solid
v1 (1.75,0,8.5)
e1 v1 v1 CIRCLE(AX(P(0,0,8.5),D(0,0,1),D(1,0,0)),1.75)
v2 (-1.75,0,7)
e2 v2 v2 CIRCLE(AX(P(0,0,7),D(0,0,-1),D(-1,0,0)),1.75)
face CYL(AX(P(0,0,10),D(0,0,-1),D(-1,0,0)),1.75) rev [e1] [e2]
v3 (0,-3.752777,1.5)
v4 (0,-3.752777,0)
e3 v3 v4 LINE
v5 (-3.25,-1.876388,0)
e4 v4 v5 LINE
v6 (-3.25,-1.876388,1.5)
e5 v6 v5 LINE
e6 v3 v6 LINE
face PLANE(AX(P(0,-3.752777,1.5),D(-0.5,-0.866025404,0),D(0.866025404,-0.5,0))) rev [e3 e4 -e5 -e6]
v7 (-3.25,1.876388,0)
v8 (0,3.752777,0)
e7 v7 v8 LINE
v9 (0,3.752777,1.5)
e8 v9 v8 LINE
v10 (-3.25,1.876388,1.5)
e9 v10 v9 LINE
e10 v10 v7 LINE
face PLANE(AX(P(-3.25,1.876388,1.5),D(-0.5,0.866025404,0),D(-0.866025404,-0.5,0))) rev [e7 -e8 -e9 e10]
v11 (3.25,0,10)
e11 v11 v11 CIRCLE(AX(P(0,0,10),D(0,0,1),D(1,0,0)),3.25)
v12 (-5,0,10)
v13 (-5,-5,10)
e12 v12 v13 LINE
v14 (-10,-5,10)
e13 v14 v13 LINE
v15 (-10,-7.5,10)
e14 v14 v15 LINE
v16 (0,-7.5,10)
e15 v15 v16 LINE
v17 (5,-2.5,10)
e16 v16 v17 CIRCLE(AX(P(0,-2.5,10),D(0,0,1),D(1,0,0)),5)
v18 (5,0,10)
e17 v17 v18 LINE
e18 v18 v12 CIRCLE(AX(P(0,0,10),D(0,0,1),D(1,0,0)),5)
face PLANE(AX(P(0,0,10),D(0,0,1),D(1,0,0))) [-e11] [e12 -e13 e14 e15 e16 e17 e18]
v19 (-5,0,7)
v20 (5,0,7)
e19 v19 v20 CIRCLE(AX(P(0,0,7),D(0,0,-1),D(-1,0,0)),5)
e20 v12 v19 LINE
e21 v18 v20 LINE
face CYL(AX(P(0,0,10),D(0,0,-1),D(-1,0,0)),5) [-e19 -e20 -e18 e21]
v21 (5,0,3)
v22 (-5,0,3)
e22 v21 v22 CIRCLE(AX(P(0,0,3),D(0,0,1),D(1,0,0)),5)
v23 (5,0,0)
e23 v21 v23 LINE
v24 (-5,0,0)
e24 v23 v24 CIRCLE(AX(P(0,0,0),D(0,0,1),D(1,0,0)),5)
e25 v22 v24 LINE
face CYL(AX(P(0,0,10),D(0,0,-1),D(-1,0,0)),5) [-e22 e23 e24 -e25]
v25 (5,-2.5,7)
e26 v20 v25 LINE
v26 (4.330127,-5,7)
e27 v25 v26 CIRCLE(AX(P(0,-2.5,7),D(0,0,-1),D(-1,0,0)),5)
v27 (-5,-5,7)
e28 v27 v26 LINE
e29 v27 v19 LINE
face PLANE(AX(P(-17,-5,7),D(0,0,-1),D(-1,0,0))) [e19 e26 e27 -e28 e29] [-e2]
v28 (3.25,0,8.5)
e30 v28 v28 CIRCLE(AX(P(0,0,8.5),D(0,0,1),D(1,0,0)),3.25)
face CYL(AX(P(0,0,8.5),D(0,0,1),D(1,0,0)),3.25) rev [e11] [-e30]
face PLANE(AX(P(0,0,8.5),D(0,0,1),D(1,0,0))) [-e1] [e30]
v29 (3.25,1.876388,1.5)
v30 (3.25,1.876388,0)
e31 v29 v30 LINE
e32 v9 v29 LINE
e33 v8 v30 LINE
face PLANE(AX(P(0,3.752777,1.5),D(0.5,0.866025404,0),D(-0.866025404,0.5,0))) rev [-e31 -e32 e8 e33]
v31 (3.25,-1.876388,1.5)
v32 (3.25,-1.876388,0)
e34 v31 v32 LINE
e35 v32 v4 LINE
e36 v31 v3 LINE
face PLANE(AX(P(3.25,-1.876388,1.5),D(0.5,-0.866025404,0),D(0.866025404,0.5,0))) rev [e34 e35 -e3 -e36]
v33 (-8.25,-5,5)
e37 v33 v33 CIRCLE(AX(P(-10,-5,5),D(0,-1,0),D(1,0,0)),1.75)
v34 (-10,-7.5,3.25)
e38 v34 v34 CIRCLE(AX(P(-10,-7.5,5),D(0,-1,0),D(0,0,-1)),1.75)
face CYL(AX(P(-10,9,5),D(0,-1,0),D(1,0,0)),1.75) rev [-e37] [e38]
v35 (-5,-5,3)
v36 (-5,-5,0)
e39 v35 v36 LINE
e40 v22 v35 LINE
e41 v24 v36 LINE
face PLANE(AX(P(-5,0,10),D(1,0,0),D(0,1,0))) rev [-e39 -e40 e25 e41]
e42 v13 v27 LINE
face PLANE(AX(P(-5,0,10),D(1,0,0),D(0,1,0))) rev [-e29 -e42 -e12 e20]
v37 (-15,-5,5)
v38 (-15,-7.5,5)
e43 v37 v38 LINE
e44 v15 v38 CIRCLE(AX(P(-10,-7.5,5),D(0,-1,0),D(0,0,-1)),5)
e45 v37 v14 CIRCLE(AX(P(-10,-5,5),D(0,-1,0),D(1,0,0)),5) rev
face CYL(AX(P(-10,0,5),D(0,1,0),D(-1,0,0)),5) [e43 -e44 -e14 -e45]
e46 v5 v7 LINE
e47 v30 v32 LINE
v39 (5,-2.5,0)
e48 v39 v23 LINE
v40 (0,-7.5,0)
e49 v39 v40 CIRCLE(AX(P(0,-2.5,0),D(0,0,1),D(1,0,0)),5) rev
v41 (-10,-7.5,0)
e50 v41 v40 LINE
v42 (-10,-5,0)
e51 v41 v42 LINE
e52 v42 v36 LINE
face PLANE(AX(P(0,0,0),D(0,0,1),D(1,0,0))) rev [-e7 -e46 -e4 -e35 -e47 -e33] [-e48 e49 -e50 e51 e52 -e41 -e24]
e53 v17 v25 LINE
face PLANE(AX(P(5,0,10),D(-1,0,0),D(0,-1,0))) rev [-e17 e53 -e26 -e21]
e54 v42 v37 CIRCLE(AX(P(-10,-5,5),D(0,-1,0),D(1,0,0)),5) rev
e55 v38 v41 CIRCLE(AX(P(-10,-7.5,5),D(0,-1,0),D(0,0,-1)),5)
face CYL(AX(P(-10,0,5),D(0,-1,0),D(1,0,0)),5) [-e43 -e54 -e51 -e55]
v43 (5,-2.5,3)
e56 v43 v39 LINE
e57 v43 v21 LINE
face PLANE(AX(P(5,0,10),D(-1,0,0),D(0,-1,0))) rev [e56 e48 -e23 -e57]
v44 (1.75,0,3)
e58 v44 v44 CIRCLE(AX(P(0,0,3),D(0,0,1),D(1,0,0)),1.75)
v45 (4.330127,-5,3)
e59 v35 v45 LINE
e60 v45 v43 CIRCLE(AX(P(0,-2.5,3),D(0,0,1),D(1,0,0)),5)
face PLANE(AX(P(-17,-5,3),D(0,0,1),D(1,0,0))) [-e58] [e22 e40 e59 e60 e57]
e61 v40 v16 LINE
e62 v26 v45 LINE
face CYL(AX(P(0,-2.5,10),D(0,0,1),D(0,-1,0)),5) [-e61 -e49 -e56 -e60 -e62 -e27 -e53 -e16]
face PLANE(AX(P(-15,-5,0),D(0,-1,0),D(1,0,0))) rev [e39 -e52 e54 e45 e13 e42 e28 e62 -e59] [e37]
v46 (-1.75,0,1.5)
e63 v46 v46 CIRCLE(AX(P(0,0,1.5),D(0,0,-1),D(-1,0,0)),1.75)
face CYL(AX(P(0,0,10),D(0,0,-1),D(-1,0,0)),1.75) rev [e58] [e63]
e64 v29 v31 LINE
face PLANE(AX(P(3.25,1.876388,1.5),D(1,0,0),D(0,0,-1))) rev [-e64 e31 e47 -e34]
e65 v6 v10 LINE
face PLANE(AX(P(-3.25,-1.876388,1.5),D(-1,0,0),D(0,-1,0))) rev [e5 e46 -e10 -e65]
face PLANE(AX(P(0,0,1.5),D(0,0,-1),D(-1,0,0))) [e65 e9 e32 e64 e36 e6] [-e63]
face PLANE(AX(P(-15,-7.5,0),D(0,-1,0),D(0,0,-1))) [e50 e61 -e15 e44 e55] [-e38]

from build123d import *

# Parameters (mm, degrees)
ESBO_O1_R                  = 5
ESBO_O1_R_2                = 1.75
RESSALTO_EXTRUS_O1_DEPTH   = 10
ESBO_O2_W                  = 10
ESBO_O2_H                  = 2.5
RESSALTO_EXTRUS_O2_DEPTH   = 20
CORTE_EXTRUS_O1_DEPTH      = 15
CORTE_EXTRUS_O1_DEPTH_BACK = 14
ESBO_O3_R                  = 1.75
CORTE_EXTRUS_O3_DEPTH      = 12
CORTE_EXTRUS_O3_DEPTH_BACK = 14
ESBO_O5_W                  = 4
ESBO_O5_H                  = 14.425539271
FILETE1_R                  = 5
FILETE2_R                  = 5
CORTE_EXTRUS_O4_DEPTH      = 1.5
ESBO_O7_R                  = 3.25
CORTE_EXTRUS_O5_DEPTH      = 1.5


# Some blends are built 0.0001 mm under size
with BuildPart() as part:
    # Esboço1 → Ressalto-extrusão1 (new body)
    # profile 1 of 3: a face of its own
    with BuildSketch(Plane.XY):
        with BuildLine():
            ThreePointArc((0, -5), (-3.535533906, -3.535533906), (-5, 0))
            Line((-5, 0), (-5, -5))
            Line((-5, -5), (0, -5))
        make_face()
    # profile 2 of 3: a face of its own
    with BuildSketch(Plane.XY):
        Circle(ESBO_O1_R)
        Circle(ESBO_O1_R_2, mode=Mode.SUBTRACT)
    # profile 3 of 3: a face of its own
    with BuildSketch(Plane.XY):
        with BuildLine():
            Line((5, -5), (5, 0))
            ThreePointArc((5, 0), (3.535533906, -3.535533906), (0, -5))
            Line((0, -5), (5, -5))
        make_face()
    extrude(amount=RESSALTO_EXTRUS_O1_DEPTH)

    # Esboço2 → Ressalto-extrusão2 (add)
    with BuildSketch(Plane(origin=(5, 0, 5), x_dir=(0, 0, 1), z_dir=(-1, 0, 0))):
        with Locations((0, -6.25)):
            Rectangle(ESBO_O2_W, ESBO_O2_H)
    extrude(amount=RESSALTO_EXTRUS_O2_DEPTH)

    # Esboço3 → Corte-extrusão1 (cut, two sides: drawn at the far end of the back side and taken through both)
    with BuildSketch(Plane.XZ.offset(5).offset(-CORTE_EXTRUS_O1_DEPTH_BACK)):
        with Locations((-10, 5)):
            Circle(ESBO_O3_R)
    extrude(amount=CORTE_EXTRUS_O1_DEPTH + CORTE_EXTRUS_O1_DEPTH_BACK, mode=Mode.SUBTRACT)

    # Esboço5 → Corte-extrusão3 (cut, two sides: drawn at the far end of the back side and taken through both)
    with BuildSketch(Plane.ZY.offset(5).offset(-CORTE_EXTRUS_O3_DEPTH_BACK)):
        with Locations((5, 2.212769635)):
            Rectangle(ESBO_O5_W, ESBO_O5_H)
    extrude(amount=CORTE_EXTRUS_O3_DEPTH + CORTE_EXTRUS_O3_DEPTH_BACK, mode=Mode.SUBTRACT)

    # Filete1
    filete1_edges = [part.edges().sort_by_distance(p)[0] for p in [
        (-15, -6.25, 10),
        (-15, -6.25, 0),
    ]]
    fillet(filete1_edges, radius=FILETE1_R - 0.0001)  # a hair under: the kernel refuses the full size

    # Filete2
    # the kernel refuses this fillet: 5 mm, written as the material it takes off along each edge
    with BuildSketch(Plane(origin=(5, -7.5, 22.5), x_dir=(-1, 0, 0), z_dir=(0, 0, -1))) as filete2_piece_1:
        with BuildLine():
            CenterArc((FILETE2_R, FILETE2_R), FILETE2_R, 180, 90)
            Line((0, FILETE2_R), (0, 0))
            Line((0, 0), (FILETE2_R, 0))
        make_face()
    extrude(amount=35, mode=Mode.SUBTRACT)

    # Esboço6 → Corte-extrusão4 (cut)
    with BuildSketch(Plane(origin=(0, 0, 0), x_dir=(-1, 0, 0), z_dir=(0, 0, -1))):
        Polygon((0, 3.75277675), (-3.25, 1.876388375), (-3.25, -1.876388375), (0, -3.75277675), (3.25, -1.876388375), (3.25, 1.876388375), align=None)
    extrude(amount=-CORTE_EXTRUS_O4_DEPTH, mode=Mode.SUBTRACT)

    # Esboço7 → Corte-extrusão5 (cut)
    with BuildSketch(Plane.XY.offset(10)):
        Circle(ESBO_O7_R)
    extrude(amount=-CORTE_EXTRUS_O5_DEPTH, mode=Mode.SUBTRACT)


solid = part.part
